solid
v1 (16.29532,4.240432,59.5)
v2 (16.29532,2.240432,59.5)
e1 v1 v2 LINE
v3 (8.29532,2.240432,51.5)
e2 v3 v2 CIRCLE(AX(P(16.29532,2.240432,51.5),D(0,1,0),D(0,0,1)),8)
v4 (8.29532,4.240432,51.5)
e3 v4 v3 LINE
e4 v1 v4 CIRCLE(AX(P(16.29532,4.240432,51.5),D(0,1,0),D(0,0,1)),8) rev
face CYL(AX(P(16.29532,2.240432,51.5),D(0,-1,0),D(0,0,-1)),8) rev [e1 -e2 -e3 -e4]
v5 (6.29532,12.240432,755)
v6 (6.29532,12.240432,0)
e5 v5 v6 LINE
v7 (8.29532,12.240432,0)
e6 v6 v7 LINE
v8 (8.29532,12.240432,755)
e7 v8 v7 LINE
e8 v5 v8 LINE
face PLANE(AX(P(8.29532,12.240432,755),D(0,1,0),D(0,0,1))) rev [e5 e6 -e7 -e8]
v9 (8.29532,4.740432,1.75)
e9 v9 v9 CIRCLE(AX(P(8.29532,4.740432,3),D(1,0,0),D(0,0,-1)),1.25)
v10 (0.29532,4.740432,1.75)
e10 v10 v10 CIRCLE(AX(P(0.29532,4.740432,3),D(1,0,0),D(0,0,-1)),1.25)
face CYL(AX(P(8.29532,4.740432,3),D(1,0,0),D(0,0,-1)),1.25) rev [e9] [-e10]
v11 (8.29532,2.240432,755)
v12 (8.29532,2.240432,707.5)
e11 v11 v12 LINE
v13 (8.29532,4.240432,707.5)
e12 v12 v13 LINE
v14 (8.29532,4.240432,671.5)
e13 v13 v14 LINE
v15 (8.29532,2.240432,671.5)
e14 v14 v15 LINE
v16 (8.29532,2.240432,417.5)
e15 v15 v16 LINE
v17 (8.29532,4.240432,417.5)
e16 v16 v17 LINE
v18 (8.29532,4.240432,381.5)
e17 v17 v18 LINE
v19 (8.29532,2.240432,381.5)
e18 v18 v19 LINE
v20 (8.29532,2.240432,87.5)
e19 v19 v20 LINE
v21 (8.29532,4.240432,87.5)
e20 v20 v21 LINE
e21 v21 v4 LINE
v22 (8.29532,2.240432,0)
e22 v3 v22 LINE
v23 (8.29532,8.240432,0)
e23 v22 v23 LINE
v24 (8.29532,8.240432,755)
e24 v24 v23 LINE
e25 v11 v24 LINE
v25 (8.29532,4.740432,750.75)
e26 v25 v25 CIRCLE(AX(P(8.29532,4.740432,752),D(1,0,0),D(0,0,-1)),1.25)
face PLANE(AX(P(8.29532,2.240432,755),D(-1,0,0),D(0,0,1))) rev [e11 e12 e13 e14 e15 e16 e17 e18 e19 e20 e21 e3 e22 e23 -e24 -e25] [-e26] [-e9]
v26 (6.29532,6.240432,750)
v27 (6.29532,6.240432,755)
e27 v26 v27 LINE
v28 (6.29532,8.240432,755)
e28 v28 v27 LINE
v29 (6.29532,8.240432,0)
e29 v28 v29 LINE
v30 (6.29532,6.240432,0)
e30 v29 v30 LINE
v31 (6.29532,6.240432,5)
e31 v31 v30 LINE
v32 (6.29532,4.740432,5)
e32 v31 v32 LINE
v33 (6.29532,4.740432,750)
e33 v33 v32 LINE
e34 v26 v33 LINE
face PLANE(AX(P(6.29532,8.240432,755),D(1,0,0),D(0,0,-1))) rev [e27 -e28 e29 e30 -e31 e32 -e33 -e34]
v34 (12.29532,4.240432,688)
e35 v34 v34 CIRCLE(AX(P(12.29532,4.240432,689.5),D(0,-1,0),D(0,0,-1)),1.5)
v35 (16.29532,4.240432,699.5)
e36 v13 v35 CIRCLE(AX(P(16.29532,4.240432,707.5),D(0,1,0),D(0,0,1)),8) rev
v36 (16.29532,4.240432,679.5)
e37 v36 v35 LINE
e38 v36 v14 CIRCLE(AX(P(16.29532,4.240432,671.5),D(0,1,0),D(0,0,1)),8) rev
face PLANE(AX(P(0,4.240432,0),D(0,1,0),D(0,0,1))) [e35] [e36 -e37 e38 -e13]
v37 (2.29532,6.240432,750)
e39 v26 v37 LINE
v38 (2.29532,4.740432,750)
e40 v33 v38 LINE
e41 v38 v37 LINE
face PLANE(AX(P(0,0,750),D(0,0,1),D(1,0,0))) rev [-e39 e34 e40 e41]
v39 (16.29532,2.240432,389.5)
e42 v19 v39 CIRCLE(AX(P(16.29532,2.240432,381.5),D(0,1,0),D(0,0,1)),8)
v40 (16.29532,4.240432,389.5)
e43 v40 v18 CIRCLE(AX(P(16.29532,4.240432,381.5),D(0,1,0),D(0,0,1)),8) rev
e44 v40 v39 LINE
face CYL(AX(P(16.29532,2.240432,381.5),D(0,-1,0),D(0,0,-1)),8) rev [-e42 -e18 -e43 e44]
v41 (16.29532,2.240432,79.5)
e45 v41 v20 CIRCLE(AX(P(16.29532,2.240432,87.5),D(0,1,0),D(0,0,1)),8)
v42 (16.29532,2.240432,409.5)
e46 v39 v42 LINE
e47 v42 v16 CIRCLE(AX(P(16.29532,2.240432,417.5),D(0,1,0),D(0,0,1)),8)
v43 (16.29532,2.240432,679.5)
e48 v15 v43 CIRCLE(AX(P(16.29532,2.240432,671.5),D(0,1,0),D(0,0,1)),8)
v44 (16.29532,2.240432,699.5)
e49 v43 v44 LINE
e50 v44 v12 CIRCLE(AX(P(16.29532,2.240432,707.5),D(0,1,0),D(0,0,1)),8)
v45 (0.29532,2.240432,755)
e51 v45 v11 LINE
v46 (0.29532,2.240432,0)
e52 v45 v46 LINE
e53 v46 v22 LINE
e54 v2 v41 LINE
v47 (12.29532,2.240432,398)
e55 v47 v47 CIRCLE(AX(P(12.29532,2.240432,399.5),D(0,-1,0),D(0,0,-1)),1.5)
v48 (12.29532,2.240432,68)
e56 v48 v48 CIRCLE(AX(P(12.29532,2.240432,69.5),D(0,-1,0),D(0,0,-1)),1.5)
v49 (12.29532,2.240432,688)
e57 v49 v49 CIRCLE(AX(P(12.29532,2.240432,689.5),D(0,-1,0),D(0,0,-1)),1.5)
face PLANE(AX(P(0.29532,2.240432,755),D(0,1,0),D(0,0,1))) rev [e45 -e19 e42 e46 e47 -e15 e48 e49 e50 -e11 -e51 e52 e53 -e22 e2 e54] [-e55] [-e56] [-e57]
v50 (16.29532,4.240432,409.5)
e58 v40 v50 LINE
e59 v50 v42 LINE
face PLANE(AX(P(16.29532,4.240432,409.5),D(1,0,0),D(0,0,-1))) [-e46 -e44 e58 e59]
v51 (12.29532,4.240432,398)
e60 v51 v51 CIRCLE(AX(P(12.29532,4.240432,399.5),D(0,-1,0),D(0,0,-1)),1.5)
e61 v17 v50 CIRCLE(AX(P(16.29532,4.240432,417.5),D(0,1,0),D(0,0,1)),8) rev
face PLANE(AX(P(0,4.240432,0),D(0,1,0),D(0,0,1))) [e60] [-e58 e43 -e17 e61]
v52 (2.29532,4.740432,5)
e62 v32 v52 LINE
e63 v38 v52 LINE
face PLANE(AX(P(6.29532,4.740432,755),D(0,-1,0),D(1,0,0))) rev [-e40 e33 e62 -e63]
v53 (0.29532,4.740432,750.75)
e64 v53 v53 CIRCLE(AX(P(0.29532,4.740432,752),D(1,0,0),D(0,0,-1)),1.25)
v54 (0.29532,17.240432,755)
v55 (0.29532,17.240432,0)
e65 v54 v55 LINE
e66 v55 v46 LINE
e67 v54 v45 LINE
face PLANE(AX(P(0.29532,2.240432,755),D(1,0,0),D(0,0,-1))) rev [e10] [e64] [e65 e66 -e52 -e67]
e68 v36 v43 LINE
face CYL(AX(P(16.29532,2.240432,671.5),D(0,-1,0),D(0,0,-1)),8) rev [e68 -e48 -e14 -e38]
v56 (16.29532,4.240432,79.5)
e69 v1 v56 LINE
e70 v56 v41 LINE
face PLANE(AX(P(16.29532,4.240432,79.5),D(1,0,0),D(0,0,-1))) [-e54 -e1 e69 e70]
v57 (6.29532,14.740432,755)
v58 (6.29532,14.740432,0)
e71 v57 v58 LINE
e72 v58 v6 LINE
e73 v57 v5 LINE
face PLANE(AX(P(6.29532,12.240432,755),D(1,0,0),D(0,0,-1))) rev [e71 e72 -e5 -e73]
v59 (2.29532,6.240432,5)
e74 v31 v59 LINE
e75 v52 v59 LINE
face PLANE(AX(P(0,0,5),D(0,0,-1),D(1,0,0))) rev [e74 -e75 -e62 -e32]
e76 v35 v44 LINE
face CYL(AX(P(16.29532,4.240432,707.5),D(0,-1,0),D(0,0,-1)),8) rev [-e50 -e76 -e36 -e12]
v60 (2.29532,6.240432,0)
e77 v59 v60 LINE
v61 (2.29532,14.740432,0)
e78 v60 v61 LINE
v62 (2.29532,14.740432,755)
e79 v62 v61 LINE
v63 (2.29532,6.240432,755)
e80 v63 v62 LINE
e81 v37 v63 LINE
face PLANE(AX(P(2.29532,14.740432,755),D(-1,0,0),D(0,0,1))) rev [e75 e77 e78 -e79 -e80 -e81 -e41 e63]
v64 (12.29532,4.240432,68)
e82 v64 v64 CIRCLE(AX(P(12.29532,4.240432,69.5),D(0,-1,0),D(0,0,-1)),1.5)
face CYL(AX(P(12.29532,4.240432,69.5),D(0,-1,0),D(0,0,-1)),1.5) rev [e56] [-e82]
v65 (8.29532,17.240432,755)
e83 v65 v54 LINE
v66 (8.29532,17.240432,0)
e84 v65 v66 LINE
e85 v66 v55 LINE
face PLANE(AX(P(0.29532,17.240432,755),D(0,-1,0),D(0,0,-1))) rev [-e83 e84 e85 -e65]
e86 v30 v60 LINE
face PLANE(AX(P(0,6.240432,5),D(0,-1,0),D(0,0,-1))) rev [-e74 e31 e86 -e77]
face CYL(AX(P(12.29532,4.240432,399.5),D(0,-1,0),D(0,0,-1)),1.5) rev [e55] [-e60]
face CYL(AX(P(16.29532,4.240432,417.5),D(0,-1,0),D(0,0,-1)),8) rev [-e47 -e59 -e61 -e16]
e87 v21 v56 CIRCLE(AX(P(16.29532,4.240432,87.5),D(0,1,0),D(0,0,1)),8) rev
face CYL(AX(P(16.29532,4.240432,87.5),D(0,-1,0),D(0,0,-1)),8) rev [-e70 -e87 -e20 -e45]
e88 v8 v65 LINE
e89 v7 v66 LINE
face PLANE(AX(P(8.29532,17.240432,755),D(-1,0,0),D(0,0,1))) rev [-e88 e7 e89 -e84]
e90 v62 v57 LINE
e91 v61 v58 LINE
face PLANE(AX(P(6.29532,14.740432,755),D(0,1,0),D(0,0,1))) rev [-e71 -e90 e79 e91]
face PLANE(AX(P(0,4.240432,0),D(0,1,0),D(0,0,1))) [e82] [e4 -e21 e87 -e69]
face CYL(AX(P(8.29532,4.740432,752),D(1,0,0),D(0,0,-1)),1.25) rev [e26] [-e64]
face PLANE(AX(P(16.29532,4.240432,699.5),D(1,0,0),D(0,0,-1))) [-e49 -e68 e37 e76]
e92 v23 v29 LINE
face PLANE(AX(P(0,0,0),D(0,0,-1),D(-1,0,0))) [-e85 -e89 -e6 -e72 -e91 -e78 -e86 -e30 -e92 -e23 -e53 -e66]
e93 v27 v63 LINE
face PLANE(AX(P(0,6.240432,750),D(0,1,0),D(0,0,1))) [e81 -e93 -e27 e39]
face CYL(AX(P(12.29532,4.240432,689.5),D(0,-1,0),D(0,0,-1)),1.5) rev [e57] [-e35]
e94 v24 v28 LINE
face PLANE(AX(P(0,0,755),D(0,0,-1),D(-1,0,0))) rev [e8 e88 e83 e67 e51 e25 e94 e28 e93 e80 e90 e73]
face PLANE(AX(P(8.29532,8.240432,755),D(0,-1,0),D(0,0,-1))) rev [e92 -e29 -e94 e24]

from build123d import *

# Parameters (mm, degrees)
EXTRUDE_1_DEPTH    = 755
SKETCH_4_W         = 8
SKETCH_4_H         = 20
SKETCH_4_R         = 1.5
EXTRUDE_2_DEPTH    = 2
FILLET_1_R         = 8
SKETCH_5_W         = 4
SKETCH_5_H         = 1.5
EXTRUDE_3_DEPTH    = 5
HOLE_WIZARD_M3_2_D = 2.5


with BuildPart() as part:
    # 草图1 → 凸台-拉伸1 (new body)
    with BuildSketch(Plane.XY):
        Polygon((0.29532044, 2.240431683), (8.29532044, 2.240431683), (8.29532044, 8.240431683), (6.29532044, 8.240431683), (6.29532044, 4.740431683), (2.29532044, 4.740431683), (2.29532044, 14.740431683), (6.29532044, 14.740431683), (6.29532044, 12.240431683), (8.29532044, 12.240431683), (8.29532044, 14.740431683), (8.29532044, 17.240431683), (0.29532044, 17.240431683), align=None)
    extrude(amount=EXTRUDE_1_DEPTH)

    # 草图4 → 凸台-拉伸2 (add)
    # profile 1 of 3: a face of its own
    with BuildSketch(Plane(origin=(0, 2.240431683, 0), x_dir=(-1, 0, 0), z_dir=(0, -1, 0))):
        with Locations((-12.29532044, -689.500000045)):
            Rectangle(SKETCH_4_W, SKETCH_4_H)
        with Locations(Location((-12.29532044, -689.500000045, 0), (0, 0, 90))):
            Circle(SKETCH_4_R, mode=Mode.SUBTRACT)
    # profile 2 of 3: a face of its own
    with BuildSketch(Plane(origin=(0, 2.240431683, 0), x_dir=(-1, 0, 0), z_dir=(0, -1, 0))):
        with Locations((-12.29532044, -399.500000045)):
            Rectangle(SKETCH_4_W, SKETCH_4_H)
        with Locations(Location((-12.29532044, -399.500000045, 0), (0, 0, 90))):
            Circle(SKETCH_4_R, mode=Mode.SUBTRACT)
    # profile 3 of 3: a face of its own
    with BuildSketch(Plane(origin=(0, 2.240431683, 0), x_dir=(-1, 0, 0), z_dir=(0, -1, 0))):
        with Locations((-12.29532044, -69.500000045)):
            Rectangle(SKETCH_4_W, SKETCH_4_H)
        with Locations(Location((-12.29532044, -69.500000045, 0), (0, 0, 90))):
            Circle(SKETCH_4_R, mode=Mode.SUBTRACT)
    extrude(amount=-EXTRUDE_2_DEPTH)

    # 圆角1
    fillet_1_edges = [part.edges().sort_by_distance(p)[0] for p in [
        (8.29532044, 3.240431683, 79.500000045),
        (8.29532044, 3.240431683, 59.500000045),
        (8.29532044, 3.240431683, 389.500000045),
        (8.29532044, 3.240431683, 409.500000045),
        (8.29532044, 3.240431683, 679.500000045),
        (8.29532044, 3.240431683, 699.500000045),
    ]]
    fillet(fillet_1_edges, radius=FILLET_1_R - 0.0001)  # a hair under: the kernel refuses the full size

    # 草图5 → 凸台-拉伸3 (add)
    with BuildSketch(Plane.XY.offset(755)):
        with Locations((4.29532044, 5.490431683)):
            Rectangle(SKETCH_5_W, SKETCH_5_H)
    extrude_3 = extrude(amount=-EXTRUDE_3_DEPTH)

    # M3 螺纹孔2 (through all)
    with Locations(Plane(origin=(8.29532044, 0, 0), x_dir=(0, 0, -1), z_dir=(1, 0, 0))):
        with Locations((-752, 4.740431683)):
            hole_wizard_m3_2 = Hole(HOLE_WIZARD_M3_2_D / 2)

    # 镜向1: 凸台-拉伸3, M3 螺纹孔2 across plane
    add(extrude_3.mirror(Plane(origin=(0, 0, 377.5), x_dir=(1, 0, 0), z_dir=(0, 0, -1))))
    add(hole_wizard_m3_2.mirror(Plane(origin=(0, 0, 377.5), x_dir=(1, 0, 0), z_dir=(0, 0, -1))), mode=Mode.SUBTRACT)


solid = part.part
